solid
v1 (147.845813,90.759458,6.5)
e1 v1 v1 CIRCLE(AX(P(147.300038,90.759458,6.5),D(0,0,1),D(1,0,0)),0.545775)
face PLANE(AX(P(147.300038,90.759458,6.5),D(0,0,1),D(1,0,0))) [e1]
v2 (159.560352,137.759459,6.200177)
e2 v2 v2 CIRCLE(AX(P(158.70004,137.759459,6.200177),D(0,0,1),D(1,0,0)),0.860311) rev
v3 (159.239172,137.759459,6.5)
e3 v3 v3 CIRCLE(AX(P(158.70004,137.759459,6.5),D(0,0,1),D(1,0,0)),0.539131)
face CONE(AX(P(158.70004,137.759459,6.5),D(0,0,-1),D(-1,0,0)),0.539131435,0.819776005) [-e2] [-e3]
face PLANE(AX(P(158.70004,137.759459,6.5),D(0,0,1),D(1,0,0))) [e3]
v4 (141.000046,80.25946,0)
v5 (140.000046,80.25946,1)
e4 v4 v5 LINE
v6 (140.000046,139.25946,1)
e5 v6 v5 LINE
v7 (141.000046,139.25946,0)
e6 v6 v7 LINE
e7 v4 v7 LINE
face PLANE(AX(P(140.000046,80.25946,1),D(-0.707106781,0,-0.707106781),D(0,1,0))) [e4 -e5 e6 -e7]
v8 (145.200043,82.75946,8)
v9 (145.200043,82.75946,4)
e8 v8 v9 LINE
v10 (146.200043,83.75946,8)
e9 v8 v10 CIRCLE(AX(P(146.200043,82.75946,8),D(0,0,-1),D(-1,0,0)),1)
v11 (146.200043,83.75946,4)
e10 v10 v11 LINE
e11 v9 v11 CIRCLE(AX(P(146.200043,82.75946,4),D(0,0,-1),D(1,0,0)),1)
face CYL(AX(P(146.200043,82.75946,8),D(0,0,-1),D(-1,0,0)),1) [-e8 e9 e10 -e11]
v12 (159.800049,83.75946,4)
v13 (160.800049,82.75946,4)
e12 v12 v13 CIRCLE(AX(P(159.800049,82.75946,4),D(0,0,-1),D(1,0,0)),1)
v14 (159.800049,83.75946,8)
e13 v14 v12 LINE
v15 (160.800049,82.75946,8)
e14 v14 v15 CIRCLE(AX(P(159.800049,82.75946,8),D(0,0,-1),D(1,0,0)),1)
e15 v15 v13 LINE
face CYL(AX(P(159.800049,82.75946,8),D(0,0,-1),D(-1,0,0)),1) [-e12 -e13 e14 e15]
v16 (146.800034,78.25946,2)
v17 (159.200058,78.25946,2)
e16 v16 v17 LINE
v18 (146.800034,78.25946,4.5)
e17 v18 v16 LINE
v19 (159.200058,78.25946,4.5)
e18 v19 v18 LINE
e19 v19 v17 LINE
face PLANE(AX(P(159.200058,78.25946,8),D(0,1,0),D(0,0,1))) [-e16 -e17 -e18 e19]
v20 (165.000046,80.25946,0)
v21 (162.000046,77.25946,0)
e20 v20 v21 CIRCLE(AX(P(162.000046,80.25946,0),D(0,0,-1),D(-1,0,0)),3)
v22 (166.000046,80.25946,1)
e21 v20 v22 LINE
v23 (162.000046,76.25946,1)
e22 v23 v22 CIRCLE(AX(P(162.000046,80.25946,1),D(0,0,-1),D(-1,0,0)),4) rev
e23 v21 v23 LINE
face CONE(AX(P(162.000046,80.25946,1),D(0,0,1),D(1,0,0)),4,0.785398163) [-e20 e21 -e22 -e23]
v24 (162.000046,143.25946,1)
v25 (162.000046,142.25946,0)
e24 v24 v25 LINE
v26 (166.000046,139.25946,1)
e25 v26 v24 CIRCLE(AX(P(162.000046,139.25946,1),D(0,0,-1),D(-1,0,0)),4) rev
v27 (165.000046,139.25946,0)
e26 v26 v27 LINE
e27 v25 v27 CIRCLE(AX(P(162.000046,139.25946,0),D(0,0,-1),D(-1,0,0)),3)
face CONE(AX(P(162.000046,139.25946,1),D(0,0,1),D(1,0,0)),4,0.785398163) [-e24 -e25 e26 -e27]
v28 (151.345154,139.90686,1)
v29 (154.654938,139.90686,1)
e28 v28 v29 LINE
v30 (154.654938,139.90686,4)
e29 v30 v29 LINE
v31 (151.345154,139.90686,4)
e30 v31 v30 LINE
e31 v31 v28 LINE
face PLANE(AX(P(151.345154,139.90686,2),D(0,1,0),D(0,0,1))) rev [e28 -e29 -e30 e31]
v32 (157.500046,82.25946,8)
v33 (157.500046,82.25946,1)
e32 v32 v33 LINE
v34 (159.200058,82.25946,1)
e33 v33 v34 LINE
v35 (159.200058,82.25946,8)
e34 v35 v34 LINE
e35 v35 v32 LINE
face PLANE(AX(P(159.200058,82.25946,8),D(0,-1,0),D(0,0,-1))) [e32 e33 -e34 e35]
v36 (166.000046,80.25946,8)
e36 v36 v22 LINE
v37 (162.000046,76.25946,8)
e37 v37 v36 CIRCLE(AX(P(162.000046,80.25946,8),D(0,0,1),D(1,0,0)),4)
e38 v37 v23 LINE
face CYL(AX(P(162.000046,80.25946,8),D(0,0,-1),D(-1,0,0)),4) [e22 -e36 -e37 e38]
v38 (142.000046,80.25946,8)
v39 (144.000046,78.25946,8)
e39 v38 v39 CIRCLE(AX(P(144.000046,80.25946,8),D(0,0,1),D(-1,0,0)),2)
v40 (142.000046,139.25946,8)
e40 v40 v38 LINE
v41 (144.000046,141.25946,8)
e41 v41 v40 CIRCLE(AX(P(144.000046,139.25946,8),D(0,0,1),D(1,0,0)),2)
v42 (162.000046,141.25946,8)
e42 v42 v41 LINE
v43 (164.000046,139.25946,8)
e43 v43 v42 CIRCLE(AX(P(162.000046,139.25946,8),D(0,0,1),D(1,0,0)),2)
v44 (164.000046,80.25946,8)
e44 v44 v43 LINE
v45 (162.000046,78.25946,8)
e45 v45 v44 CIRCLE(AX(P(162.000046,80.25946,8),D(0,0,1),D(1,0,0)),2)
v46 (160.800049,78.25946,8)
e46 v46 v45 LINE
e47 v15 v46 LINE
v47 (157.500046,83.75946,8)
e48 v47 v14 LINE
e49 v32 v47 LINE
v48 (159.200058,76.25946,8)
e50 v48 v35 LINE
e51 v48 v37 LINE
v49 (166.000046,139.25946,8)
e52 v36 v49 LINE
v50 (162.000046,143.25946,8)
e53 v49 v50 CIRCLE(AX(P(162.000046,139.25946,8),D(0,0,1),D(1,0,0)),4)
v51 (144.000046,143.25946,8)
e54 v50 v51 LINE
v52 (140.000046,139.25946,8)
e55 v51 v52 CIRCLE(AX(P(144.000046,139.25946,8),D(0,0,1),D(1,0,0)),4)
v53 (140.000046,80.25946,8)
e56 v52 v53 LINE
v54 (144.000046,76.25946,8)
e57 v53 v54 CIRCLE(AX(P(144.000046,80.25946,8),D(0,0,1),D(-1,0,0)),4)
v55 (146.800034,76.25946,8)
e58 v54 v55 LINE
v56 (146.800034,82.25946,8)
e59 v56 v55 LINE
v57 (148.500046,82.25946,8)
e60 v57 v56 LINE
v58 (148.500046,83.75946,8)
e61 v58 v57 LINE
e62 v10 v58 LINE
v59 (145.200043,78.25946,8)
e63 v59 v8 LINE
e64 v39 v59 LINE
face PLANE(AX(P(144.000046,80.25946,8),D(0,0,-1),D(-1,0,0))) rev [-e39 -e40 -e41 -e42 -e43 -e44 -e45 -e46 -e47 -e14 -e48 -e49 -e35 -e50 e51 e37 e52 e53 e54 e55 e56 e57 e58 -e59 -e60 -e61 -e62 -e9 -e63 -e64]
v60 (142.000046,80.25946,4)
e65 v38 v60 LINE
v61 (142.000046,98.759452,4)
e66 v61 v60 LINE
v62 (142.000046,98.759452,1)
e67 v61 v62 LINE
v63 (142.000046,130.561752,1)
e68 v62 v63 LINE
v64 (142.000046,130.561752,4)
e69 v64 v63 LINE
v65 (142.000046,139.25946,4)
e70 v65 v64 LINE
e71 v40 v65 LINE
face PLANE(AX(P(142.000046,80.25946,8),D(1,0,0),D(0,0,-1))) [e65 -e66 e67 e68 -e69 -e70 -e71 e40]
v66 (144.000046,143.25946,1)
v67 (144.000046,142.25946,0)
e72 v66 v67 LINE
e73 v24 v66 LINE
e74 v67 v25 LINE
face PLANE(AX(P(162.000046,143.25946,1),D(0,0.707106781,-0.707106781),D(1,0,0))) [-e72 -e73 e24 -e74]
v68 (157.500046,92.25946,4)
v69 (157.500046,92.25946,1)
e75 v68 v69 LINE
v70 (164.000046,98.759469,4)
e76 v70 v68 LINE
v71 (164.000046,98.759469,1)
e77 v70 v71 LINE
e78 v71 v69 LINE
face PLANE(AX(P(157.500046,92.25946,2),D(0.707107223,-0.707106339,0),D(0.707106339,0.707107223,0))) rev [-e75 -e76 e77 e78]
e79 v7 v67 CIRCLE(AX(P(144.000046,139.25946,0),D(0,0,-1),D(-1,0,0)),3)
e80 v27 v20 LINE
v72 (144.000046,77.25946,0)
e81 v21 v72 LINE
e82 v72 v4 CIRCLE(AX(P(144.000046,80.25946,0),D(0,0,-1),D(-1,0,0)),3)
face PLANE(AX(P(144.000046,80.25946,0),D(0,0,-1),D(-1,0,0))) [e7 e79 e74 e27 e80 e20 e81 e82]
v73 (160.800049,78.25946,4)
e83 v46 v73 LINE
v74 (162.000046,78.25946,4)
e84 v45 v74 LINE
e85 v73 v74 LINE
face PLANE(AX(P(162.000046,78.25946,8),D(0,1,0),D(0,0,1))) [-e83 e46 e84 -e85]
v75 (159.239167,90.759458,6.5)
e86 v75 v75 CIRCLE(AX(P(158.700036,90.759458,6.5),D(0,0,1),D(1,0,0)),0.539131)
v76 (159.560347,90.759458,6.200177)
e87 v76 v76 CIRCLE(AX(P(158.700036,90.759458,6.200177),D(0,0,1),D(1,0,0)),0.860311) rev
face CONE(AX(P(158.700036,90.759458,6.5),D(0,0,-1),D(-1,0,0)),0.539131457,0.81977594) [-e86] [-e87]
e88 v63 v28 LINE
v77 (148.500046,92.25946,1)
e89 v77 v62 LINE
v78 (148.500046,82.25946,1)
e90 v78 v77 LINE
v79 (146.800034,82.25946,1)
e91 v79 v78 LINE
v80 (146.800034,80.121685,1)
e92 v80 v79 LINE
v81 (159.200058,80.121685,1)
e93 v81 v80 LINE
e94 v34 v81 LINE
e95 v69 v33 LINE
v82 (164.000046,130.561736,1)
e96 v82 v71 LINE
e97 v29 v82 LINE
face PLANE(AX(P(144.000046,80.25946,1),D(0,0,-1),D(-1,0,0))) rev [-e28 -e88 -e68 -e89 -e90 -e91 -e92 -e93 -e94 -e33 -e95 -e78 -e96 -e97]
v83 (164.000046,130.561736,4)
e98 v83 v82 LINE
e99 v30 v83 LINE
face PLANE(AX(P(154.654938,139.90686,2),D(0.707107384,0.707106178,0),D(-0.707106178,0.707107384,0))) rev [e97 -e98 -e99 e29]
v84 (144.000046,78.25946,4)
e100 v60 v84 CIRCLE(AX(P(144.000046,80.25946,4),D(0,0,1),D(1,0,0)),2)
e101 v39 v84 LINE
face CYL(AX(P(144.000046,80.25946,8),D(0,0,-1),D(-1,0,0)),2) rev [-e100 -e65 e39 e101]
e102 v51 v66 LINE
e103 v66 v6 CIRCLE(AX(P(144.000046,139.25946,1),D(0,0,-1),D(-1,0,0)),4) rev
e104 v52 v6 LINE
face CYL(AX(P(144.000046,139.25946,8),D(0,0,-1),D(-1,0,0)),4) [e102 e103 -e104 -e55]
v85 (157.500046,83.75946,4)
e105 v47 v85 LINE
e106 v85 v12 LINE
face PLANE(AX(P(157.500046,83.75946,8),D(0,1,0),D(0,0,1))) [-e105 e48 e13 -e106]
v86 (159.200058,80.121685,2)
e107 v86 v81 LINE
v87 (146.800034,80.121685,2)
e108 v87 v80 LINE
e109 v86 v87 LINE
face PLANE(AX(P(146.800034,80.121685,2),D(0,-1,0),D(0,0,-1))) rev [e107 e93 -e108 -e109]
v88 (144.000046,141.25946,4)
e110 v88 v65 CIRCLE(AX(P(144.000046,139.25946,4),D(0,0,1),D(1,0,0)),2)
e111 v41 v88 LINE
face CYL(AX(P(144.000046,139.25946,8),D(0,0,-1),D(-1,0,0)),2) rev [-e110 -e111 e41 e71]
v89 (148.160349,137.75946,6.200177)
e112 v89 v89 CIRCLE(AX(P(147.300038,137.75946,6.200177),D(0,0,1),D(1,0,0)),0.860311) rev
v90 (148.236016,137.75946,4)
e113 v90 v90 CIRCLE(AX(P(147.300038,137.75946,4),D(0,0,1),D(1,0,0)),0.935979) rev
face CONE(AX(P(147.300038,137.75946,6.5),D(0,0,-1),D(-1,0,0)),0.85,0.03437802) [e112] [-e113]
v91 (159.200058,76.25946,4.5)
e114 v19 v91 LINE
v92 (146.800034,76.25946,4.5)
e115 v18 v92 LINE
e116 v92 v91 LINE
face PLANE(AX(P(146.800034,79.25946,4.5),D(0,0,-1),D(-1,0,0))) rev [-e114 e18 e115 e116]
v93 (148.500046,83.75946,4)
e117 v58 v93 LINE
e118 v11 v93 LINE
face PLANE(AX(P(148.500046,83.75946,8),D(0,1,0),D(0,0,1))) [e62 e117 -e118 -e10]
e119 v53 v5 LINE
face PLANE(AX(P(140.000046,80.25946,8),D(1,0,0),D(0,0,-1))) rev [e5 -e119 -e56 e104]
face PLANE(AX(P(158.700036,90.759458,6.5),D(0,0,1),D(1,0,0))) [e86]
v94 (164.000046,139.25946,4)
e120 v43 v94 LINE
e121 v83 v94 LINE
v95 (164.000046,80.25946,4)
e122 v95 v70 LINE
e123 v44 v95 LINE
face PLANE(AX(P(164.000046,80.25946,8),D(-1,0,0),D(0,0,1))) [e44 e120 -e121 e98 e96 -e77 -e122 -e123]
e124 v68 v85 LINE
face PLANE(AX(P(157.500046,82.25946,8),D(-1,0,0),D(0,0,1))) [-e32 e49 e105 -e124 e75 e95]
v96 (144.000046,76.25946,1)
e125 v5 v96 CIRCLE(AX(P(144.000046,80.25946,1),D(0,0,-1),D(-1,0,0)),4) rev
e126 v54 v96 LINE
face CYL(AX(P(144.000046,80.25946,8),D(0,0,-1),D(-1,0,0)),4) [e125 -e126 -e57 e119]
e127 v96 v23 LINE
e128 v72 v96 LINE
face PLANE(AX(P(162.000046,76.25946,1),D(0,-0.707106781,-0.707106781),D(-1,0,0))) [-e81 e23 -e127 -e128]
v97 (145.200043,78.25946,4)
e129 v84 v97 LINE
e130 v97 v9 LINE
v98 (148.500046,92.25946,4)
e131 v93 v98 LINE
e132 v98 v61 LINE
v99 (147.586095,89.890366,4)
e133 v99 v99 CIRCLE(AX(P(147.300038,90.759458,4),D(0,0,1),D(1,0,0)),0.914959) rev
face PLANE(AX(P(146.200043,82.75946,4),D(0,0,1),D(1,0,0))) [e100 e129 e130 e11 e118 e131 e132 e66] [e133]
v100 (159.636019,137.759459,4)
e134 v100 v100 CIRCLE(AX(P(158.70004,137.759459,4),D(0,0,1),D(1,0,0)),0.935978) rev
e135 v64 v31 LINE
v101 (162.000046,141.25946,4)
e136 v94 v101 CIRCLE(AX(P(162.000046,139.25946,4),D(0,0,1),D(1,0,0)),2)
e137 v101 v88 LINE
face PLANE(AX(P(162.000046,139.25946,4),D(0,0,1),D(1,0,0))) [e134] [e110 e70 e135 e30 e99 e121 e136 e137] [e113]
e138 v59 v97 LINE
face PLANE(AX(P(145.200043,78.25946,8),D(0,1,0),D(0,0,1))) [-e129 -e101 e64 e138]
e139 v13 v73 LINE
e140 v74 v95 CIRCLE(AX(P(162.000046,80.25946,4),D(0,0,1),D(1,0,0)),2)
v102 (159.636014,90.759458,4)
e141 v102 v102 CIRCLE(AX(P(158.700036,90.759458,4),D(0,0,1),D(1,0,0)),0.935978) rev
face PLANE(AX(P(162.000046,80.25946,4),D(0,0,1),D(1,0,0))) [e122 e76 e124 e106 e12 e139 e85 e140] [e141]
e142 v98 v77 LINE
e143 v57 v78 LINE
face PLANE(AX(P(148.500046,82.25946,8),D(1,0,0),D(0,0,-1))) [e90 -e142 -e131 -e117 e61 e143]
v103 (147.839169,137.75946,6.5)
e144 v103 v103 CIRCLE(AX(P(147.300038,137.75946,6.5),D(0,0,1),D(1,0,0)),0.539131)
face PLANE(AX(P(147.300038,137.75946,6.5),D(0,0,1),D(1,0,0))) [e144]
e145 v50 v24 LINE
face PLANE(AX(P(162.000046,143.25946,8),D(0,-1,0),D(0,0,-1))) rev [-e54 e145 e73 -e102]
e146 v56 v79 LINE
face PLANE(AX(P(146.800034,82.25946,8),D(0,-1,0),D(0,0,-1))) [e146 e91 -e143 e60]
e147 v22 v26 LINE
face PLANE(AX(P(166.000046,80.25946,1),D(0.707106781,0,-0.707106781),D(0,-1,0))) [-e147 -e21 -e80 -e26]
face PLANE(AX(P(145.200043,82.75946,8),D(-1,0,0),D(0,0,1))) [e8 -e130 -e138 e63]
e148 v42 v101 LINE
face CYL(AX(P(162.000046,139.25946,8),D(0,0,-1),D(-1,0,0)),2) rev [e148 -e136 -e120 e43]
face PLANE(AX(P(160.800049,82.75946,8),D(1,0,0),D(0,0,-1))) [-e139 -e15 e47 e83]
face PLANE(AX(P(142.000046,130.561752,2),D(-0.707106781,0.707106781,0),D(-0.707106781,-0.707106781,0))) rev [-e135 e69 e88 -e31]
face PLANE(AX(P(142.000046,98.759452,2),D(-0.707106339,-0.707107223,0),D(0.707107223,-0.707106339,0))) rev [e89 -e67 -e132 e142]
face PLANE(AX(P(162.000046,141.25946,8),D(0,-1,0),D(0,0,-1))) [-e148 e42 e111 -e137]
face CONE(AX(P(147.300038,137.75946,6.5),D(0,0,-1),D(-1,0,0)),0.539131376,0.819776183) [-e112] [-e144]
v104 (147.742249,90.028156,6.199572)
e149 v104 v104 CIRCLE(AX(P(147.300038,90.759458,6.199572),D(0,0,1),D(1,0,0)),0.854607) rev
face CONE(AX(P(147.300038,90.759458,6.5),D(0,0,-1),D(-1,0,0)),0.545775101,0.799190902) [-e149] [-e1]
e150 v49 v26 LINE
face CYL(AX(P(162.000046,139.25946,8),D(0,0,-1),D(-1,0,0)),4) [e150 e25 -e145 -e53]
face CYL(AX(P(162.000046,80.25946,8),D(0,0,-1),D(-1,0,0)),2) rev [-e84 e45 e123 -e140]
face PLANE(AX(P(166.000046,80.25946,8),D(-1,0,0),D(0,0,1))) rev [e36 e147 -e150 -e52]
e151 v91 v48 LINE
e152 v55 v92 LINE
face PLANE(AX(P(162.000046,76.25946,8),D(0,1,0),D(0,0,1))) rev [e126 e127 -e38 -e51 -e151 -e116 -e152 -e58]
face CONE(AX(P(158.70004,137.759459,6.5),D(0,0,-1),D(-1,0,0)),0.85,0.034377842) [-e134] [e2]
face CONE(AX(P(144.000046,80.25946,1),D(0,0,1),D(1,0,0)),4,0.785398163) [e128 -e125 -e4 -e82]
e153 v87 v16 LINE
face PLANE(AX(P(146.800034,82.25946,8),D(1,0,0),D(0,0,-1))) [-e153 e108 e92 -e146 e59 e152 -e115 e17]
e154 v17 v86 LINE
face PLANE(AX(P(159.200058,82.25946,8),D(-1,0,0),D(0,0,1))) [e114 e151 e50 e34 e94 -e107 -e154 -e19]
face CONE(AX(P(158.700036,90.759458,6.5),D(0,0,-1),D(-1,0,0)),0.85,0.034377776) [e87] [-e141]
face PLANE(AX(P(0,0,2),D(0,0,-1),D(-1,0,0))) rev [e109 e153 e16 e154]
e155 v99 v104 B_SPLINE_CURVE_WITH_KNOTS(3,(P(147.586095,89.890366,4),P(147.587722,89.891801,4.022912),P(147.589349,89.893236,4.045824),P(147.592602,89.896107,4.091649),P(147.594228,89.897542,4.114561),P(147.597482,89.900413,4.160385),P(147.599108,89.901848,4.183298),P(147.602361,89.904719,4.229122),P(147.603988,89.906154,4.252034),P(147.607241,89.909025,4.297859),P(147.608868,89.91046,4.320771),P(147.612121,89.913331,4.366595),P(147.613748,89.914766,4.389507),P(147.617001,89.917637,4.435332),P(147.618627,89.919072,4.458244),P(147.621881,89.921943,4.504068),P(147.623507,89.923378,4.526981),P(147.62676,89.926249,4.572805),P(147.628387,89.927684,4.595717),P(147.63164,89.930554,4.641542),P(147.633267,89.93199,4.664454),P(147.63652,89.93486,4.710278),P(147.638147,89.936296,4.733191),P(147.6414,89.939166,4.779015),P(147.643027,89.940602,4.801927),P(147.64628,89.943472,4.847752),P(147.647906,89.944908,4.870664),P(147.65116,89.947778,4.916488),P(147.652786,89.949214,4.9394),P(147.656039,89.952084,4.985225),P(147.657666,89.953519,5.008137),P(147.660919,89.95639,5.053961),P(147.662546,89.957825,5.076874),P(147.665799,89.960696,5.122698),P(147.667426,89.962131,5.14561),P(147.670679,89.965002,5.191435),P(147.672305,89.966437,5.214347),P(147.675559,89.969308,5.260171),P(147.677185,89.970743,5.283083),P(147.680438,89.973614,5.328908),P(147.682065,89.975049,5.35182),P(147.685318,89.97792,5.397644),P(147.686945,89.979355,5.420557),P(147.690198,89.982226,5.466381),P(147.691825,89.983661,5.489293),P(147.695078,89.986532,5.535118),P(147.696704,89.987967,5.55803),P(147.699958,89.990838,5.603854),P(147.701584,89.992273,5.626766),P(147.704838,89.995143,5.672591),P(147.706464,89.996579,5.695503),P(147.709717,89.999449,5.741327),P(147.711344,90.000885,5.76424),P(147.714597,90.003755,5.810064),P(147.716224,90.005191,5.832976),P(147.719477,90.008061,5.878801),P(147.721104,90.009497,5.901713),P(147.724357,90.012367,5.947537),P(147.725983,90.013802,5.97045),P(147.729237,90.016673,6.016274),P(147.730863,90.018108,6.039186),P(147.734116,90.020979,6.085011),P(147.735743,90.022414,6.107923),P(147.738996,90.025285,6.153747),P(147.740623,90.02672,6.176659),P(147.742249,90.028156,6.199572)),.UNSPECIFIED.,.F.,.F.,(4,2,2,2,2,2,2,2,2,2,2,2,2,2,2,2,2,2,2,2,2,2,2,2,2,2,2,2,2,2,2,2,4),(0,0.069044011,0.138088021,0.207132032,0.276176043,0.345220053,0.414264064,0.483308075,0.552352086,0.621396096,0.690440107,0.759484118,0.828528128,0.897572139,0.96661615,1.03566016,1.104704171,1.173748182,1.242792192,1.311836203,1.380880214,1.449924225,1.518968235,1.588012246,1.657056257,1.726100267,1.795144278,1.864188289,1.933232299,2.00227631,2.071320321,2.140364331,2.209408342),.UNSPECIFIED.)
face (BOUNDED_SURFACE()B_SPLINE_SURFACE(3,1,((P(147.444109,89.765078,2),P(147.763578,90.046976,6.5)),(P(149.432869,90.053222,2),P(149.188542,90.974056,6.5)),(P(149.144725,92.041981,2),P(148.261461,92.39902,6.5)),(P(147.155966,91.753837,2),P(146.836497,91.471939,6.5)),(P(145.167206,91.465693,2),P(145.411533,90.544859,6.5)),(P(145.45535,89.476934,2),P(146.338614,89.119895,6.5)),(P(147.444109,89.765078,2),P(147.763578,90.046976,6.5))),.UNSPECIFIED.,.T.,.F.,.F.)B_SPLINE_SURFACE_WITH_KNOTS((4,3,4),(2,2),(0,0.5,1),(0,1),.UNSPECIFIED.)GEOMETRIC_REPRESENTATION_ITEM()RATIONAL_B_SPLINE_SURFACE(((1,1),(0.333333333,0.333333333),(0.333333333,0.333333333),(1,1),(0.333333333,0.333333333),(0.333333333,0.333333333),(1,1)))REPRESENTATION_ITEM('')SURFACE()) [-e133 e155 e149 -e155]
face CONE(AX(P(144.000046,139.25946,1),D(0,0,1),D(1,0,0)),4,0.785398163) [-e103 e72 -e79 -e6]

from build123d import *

# Parameters (mm, degrees)
BOSS_EXTRUDE1_DEPTH = 8
BOSS_EXTRUDE2_DEPTH = 1
SKETCH3_W           = 12.400024414
SKETCH3_H           = 1.862224361
BOSS_EXTRUDE3_DEPTH = 1
SKETCH6_R           = 0.85
SKETCH5_R           = 1.004760965
SKETCH5_4_R         = 1.00476126
SKETCH6_4_R         = 0.85
SKETCH6_6_R         = 0.85
SKETCH5_6_R         = 1.004762062
CHAMFER1_SIZE       = 0.3
CHAMFER1_SIZE_2     = 0.310868543
CHAMFER1_SIZE_3     = 0.304224899
CHAMFER1_SIZE_4     = 0.310868565
CHAMFER1_SIZE_5     = 0.310868624
CHAMFER2_SIZE       = 1
SKETCH7_W           = 12.400024414
SKETCH7_H           = 3.5
CUT_EXTRUDE1_DEPTH  = 3
BOSS_EXTRUDE4_DEPTH = 2


with BuildPart() as part:
    # Sketch1 → Boss-Extrude1 (new body)
    with BuildSketch(Plane.XY):
        with BuildLine():
            Line((162.000045776, 76.259460449), (144.000045776, 76.259460449))
            ThreePointArc((144.000045776, 76.259460449), (141.171618652, 77.431033324), (140.000045776, 80.259460449))
            Line((140.000045776, 80.259460449), (140.000045776, 139.259460449))
            ThreePointArc((140.000045776, 139.259460449), (141.171618652, 142.087887574), (144.000045776, 143.259460449))
            Line((144.000045776, 143.259460449), (162.000045776, 143.259460449))
            ThreePointArc((162.000045776, 143.259460449), (164.828472901, 142.087887574), (166.000045776, 139.259460449))
            Line((166.000045776, 139.259460449), (166.000045776, 80.259460449))
            ThreePointArc((166.000045776, 80.259460449), (164.828472901, 77.431033324), (162.000045776, 76.259460449))
        make_face()
        with BuildLine():
            Line((162.000045776, 78.259460449), (160.800048828, 78.259460449))
            Line((160.800048828, 78.259460449), (160.800048828, 82.759460449))
            ThreePointArc((160.800048828, 82.759460449), (160.507155609, 83.46656723), (159.800048828, 83.759460449))
            Line((159.800048828, 83.759460449), (157.500045776, 83.759460449))
            Line((157.500045776, 83.759460449), (157.500045776, 82.259460449))
            Line((157.500045776, 82.259460449), (159.200057983, 82.259460449))
            Line((159.200057983, 82.259460449), (159.200057983, 78.259460449))
            Line((159.200057983, 78.259460449), (146.800033569, 78.259460449))
            Line((146.800033569, 78.259460449), (146.800033569, 82.259460449))
            Line((146.800033569, 82.259460449), (148.500045776, 82.259460449))
            Line((148.500045776, 82.259460449), (148.500045776, 83.759460449))
            Line((148.500045776, 83.759460449), (146.200042725, 83.759460449))
            ThreePointArc((146.200042725, 83.759460449), (145.492935943, 83.46656723), (145.200042725, 82.759460449))
            Line((145.200042725, 82.759460449), (145.200042725, 78.259460449))
            Line((145.200042725, 78.259460449), (144.000045776, 78.259460449))
            ThreePointArc((144.000045776, 78.259460449), (142.585832214, 78.845246887), (142.000045776, 80.259460449))
            Line((142.000045776, 80.259460449), (142.000045776, 139.259460449))
            ThreePointArc((142.000045776, 139.259460449), (142.585832214, 140.673674012), (144.000045776, 141.259460449))
            Line((144.000045776, 141.259460449), (162.000045776, 141.259460449))
            ThreePointArc((162.000045776, 141.259460449), (163.414259339, 140.673674012), (164.000045776, 139.259460449))
            Line((164.000045776, 139.259460449), (164.000045776, 80.259460449))
            ThreePointArc((164.000045776, 80.259460449), (163.414259339, 78.845246887), (162.000045776, 78.259460449))
        make_face(mode=Mode.SUBTRACT)
    extrude(amount=BOSS_EXTRUDE1_DEPTH)

    # Sketch2 → Boss-Extrude2 (add)
    with BuildSketch(Plane(origin=(0, 0, 0), x_dir=(-1, 0, 0), z_dir=(0, 0, -1))):
        with BuildLine():
            Line((-140.000045776, 80.259460449), (-140.000045776, 139.259460449))
            ThreePointArc((-140.000045776, 139.259460449), (-141.171618652, 142.087887574), (-144.000045776, 143.259460449))
            Line((-144.000045776, 143.259460449), (-162.000045776, 143.259460449))
            ThreePointArc((-162.000045776, 143.259460449), (-164.828472901, 142.087887574), (-166.000045776, 139.259460449))
            Line((-166.000045776, 139.259460449), (-166.000045776, 80.259460449))
            ThreePointArc((-166.000045776, 80.259460449), (-164.828472901, 77.431033324), (-162.000045776, 76.259460449))
            Line((-162.000045776, 76.259460449), (-144.000045776, 76.259460449))
            ThreePointArc((-144.000045776, 76.259460449), (-141.171618652, 77.431033324), (-140.000045776, 80.259460449))
        make_face()
    extrude(amount=-BOSS_EXTRUDE2_DEPTH)

    # Sketch3 → Boss-Extrude3 (add)
    with BuildSketch(Plane.XY.offset(1)):
        with BuildLine():
            Line((142.000045776, 130.561752319), (151.345153809, 139.906860352))
            Line((151.345153809, 139.906860352), (154.654937744, 139.906860352))
            Line((154.654937744, 139.906860352), (164.000045776, 130.561736378))
            Line((164.000045776, 130.561736378), (164.000045776, 139.259460449))
            ThreePointArc((164.000045776, 139.259460449), (163.414259339, 140.673674012), (162.000045776, 141.259460449))
            Line((162.000045776, 141.259460449), (144.000045776, 141.259460449))
            ThreePointArc((144.000045776, 141.259460449), (142.585832214, 140.673674012), (142.000045776, 139.259460449))
            Line((142.000045776, 139.259460449), (142.000045776, 130.561752319))
        make_face()
        with BuildLine():
            Line((142.000045776, 98.75945232), (148.500045776, 92.259460449))
            Line((148.500045776, 92.259460449), (148.500045776, 83.759460449))
            Line((148.500045776, 83.759460449), (146.200042725, 83.759460449))
            ThreePointArc((146.200042725, 83.759460449), (145.492935943, 83.46656723), (145.200042725, 82.759460449))
            Line((145.200042725, 82.759460449), (145.200042725, 78.259460449))
            Line((145.200042725, 78.259460449), (144.000045776, 78.259460449))
            ThreePointArc((144.000045776, 78.259460449), (142.585832214, 78.845246887), (142.000045776, 80.259460449))
            Line((142.000045776, 80.259460449), (142.000045776, 98.75945232))
        make_face()
        with BuildLine():
            Line((164.000045776, 80.259460449), (164.000045776, 98.759468579))
            Line((164.000045776, 98.759468579), (157.500045776, 92.259460449))
            Line((157.500045776, 92.259460449), (157.500045776, 83.759460449))
            Line((157.500045776, 83.759460449), (159.800048828, 83.759460449))
            ThreePointArc((159.800048828, 83.759460449), (160.507155609, 83.46656723), (160.800048828, 82.759460449))
            Line((160.800048828, 82.759460449), (160.800048828, 78.259460449))
            Line((160.800048828, 78.259460449), (162.000045776, 78.259460449))
            ThreePointArc((162.000045776, 78.259460449), (163.414259339, 78.845246887), (164.000045776, 80.259460449))
        make_face()
        with Locations((153.000045776, 79.190572629)):
            Rectangle(SKETCH3_W, SKETCH3_H)
    extrude(amount=BOSS_EXTRUDE3_DEPTH)

    # Sketch6 → Loft2 section 0
    with BuildSketch(Plane.XY.offset(6.5)):
        with Locations((158.700035969, 90.759458357)):
            Circle(SKETCH6_R)
    # Sketch5 → Loft2 section 1
    with BuildSketch(Plane.XY.offset(2)):
        with Locations((158.700035969, 90.759458357)):
            Circle(SKETCH5_R)
    loft()

    # Loft3: read off the stored shape, not the designer's step
    # Loft3: loft between two sections, ruled curve by curve
    loft3_from = [
        Edge.make_bspline([(147.444109371, 89.765077917, 2), (149.432868581, 90.053221641, 2), (149.144724857, 92.041980852, 2), (147.155965647, 91.753837127, 2), (145.167206436, 91.465693402, 2), (145.455350161, 89.476934192, 2), (147.444109371, 89.765077917, 2)], [0, 0, 0, 0, 0.5, 0.5, 0.5, 1, 1, 1, 1], 3, [1, 0.333333333, 0.333333333, 1, 0.333333333, 0.333333333, 1]),
    ]
    loft3_to = [
        Edge.make_bspline([(147.763577739, 90.046975624, 6.5), (149.188541535, 90.974056083, 6.5), (148.261461076, 92.39901988, 6.5), (146.836497279, 91.47193942, 6.5), (145.411533483, 90.544858961, 6.5), (146.338613942, 89.119895164, 6.5), (147.763577739, 90.046975624, 6.5)], [0, 0, 0, 0, 0.5, 0.5, 0.5, 1, 1, 1, 1], 3, [1, 0.333333333, 0.333333333, 1, 0.333333333, 0.333333333, 1]),
    ]
    loft3 = Solid(Shell([*[Face.make_surface_from_curves(loft3_from[k], loft3_to[k]) for k in range(1)], Face(Wire(loft3_from)), Face(Wire(loft3_to))]))
    add(loft3)

    # Sketch5<4> → Loft4 section 0
    with BuildSketch(Plane.XY.offset(2)):
        with Locations((158.700040262, 137.759458688)):
            Circle(SKETCH5_4_R)
    # Sketch6<4> → Loft4 section 1
    with BuildSketch(Plane.XY.offset(6.5)):
        with Locations((158.700040262, 137.759458688)):
            Circle(SKETCH6_4_R)
    loft()

    # Sketch6<6> → Loft5 section 0
    with BuildSketch(Plane.XY.offset(6.5)):
        with Locations((147.300037543, 137.759459976)):
            Circle(SKETCH6_6_R)
    # Sketch5<6> → Loft5 section 1
    with BuildSketch(Plane.XY.offset(2)):
        with Locations((147.300037543, 137.759459976)):
            Circle(SKETCH5_6_R)
    loft()

    # Chamfer1
    # the kernel refuses this chamfer: 0.310868624, 0.310868565, 0.310868543, 0.304224899, 0.3 mm, written as the material it takes off along each edge
    with BuildSketch(Plane(origin=(158.700035969, 90.759458357, 6.5), x_dir=(1, 0, 0), z_dir=(0, -1, 0))) as chamfer1_piece_1:
        Polygon((0.85 + CHAMFER1_SIZE * 0.0343710051368, -CHAMFER1_SIZE * 0.999409142447), (0.85 - CHAMFER1_SIZE_2 * 1.00000000105, 0), (0.85, 0), align=None)
    revolve(axis=Axis((158.700035969, 90.759458357, 6.5), (0, 0, 1)), mode=Mode.SUBTRACT)
    with BuildSketch(Plane(origin=(147.300037509, 90.759457522, 6.5), x_dir=(0.5453414472456917, -0.83821399768554, 0), z_dir=(-0.83821399768554, -0.5453414472456917, 0))) as chamfer1_piece_2:
        with BuildLine():
            Line((0.85 + CHAMFER1_SIZE * 0.0153320660096, -CHAMFER1_SIZE * 0.999882456968), (0.85 - CHAMFER1_SIZE_3, 0))
            Line((0.85 - CHAMFER1_SIZE_3, 0), (0.85, 0))
            ThreePointArc((0.85, 0), (0.852250758, -0.154289578), (0.85 + CHAMFER1_SIZE * 0.0153320660096, -CHAMFER1_SIZE * 0.999882456968))
        make_face()
    revolve(axis=Axis((147.300037509, 90.759457522, 6.5), (0, 0, 1)), mode=Mode.SUBTRACT)
    with BuildSketch(Plane(origin=(158.700040262, 137.759458688, 6.5), x_dir=(1, 0, 0), z_dir=(0, -1, 0))) as chamfer1_piece_3:
        Polygon((0.85 + CHAMFER1_SIZE * 0.0343710705269, -CHAMFER1_SIZE * 0.999409140198), (0.85 - CHAMFER1_SIZE_4, 0), (0.85, 0), align=None)
    revolve(axis=Axis((158.700040262, 137.759458688, 6.5), (0, 0, 1)), mode=Mode.SUBTRACT)
    with BuildSketch(Plane(origin=(147.300037543, 137.759459976, 6.5), x_dir=(1, 0, 0), z_dir=(0, -1, 0))) as chamfer1_piece_4:
        Polygon((0.85 + CHAMFER1_SIZE * 0.0343712486304, -CHAMFER1_SIZE * 0.999409134073), (0.85 - CHAMFER1_SIZE_5 * 1.00000000148, 0), (0.85, 0), align=None)
    revolve(axis=Axis((147.300037543, 137.759459976, 6.5), (0, 0, 1)), mode=Mode.SUBTRACT)

    # Chamfer2
    chamfer2_edges = [part.edges().sort_by_distance(p)[0] for p in [
        (166.000045776, 109.759460449, 0),
        (164.828472901, 77.431033324, 0),
        (153.000045776, 76.259460449, 0),
        (141.171618652, 77.431033324, 0),
        (140.000045776, 109.759460449, 0),
        (141.171618652, 142.087887574, 0),
        (153.000045776, 143.259460449, 0),
        (164.828472901, 142.087887574, 0),
    ]]
    chamfer(chamfer2_edges, length=CHAMFER2_SIZE)

    # Sketch7 → Cut-Extrude1 (cut)
    with BuildSketch(Plane.XZ.offset(-76.259460449)):
        with Locations((153.000045776, 6.25)):
            Rectangle(SKETCH7_W, SKETCH7_H)
    extrude(amount=-CUT_EXTRUDE1_DEPTH, mode=Mode.SUBTRACT)

    # Sketch8 → Boss-Extrude4 (add)
    with BuildSketch(Plane.XY.offset(2)):
        with BuildLine():
            Line((162.000045776, 141.259460449), (144.000045776, 141.259460449))
            ThreePointArc((144.000045776, 141.259460449), (142.585832214, 140.673674012), (142.000045776, 139.259460449))
            Line((142.000045776, 139.259460449), (142.000045776, 130.561752319))
            Line((142.000045776, 130.561752319), (151.345153809, 139.906860352))
            Line((151.345153809, 139.906860352), (154.654937744, 139.906860352))
            Line((154.654937744, 139.906860352), (164.000045776, 130.561736378))
            Line((164.000045776, 130.561736378), (164.000045776, 139.259460449))
            ThreePointArc((164.000045776, 139.259460449), (163.414259339, 140.673674012), (162.000045776, 141.259460449))
        make_face()
        with BuildLine():
            Line((164.000045776, 80.259460449), (164.000045776, 98.759468579))
            Line((164.000045776, 98.759468579), (157.500045776, 92.259460449))
            Line((157.500045776, 92.259460449), (157.500045776, 83.759460449))
            Line((157.500045776, 83.759460449), (159.800048828, 83.759460449))
            ThreePointArc((159.800048828, 83.759460449), (160.507155609, 83.46656723), (160.800048828, 82.759460449))
            Line((160.800048828, 82.759460449), (160.800048828, 78.259460449))
            Line((160.800048828, 78.259460449), (162.000045776, 78.259460449))
            ThreePointArc((162.000045776, 78.259460449), (163.414259339, 78.845246887), (164.000045776, 80.259460449))
        make_face()
        with BuildLine():
            Line((146.200042725, 83.759460449), (148.500045776, 83.759460449))
            Line((148.500045776, 83.759460449), (148.500045776, 92.259460449))
            Line((148.500045776, 92.259460449), (142.000045776, 98.75945232))
            Line((142.000045776, 98.75945232), (142.000045776, 80.259460449))
            ThreePointArc((142.000045776, 80.259460449), (142.585832214, 78.845246887), (144.000045776, 78.259460449))
            Line((144.000045776, 78.259460449), (145.200042725, 78.259460449))
            Line((145.200042725, 78.259460449), (145.200042725, 82.759460449))
            ThreePointArc((145.200042725, 82.759460449), (145.492935943, 83.46656723), (146.200042725, 83.759460449))
        make_face()
    extrude(amount=BOSS_EXTRUDE4_DEPTH)


solid = part.part
